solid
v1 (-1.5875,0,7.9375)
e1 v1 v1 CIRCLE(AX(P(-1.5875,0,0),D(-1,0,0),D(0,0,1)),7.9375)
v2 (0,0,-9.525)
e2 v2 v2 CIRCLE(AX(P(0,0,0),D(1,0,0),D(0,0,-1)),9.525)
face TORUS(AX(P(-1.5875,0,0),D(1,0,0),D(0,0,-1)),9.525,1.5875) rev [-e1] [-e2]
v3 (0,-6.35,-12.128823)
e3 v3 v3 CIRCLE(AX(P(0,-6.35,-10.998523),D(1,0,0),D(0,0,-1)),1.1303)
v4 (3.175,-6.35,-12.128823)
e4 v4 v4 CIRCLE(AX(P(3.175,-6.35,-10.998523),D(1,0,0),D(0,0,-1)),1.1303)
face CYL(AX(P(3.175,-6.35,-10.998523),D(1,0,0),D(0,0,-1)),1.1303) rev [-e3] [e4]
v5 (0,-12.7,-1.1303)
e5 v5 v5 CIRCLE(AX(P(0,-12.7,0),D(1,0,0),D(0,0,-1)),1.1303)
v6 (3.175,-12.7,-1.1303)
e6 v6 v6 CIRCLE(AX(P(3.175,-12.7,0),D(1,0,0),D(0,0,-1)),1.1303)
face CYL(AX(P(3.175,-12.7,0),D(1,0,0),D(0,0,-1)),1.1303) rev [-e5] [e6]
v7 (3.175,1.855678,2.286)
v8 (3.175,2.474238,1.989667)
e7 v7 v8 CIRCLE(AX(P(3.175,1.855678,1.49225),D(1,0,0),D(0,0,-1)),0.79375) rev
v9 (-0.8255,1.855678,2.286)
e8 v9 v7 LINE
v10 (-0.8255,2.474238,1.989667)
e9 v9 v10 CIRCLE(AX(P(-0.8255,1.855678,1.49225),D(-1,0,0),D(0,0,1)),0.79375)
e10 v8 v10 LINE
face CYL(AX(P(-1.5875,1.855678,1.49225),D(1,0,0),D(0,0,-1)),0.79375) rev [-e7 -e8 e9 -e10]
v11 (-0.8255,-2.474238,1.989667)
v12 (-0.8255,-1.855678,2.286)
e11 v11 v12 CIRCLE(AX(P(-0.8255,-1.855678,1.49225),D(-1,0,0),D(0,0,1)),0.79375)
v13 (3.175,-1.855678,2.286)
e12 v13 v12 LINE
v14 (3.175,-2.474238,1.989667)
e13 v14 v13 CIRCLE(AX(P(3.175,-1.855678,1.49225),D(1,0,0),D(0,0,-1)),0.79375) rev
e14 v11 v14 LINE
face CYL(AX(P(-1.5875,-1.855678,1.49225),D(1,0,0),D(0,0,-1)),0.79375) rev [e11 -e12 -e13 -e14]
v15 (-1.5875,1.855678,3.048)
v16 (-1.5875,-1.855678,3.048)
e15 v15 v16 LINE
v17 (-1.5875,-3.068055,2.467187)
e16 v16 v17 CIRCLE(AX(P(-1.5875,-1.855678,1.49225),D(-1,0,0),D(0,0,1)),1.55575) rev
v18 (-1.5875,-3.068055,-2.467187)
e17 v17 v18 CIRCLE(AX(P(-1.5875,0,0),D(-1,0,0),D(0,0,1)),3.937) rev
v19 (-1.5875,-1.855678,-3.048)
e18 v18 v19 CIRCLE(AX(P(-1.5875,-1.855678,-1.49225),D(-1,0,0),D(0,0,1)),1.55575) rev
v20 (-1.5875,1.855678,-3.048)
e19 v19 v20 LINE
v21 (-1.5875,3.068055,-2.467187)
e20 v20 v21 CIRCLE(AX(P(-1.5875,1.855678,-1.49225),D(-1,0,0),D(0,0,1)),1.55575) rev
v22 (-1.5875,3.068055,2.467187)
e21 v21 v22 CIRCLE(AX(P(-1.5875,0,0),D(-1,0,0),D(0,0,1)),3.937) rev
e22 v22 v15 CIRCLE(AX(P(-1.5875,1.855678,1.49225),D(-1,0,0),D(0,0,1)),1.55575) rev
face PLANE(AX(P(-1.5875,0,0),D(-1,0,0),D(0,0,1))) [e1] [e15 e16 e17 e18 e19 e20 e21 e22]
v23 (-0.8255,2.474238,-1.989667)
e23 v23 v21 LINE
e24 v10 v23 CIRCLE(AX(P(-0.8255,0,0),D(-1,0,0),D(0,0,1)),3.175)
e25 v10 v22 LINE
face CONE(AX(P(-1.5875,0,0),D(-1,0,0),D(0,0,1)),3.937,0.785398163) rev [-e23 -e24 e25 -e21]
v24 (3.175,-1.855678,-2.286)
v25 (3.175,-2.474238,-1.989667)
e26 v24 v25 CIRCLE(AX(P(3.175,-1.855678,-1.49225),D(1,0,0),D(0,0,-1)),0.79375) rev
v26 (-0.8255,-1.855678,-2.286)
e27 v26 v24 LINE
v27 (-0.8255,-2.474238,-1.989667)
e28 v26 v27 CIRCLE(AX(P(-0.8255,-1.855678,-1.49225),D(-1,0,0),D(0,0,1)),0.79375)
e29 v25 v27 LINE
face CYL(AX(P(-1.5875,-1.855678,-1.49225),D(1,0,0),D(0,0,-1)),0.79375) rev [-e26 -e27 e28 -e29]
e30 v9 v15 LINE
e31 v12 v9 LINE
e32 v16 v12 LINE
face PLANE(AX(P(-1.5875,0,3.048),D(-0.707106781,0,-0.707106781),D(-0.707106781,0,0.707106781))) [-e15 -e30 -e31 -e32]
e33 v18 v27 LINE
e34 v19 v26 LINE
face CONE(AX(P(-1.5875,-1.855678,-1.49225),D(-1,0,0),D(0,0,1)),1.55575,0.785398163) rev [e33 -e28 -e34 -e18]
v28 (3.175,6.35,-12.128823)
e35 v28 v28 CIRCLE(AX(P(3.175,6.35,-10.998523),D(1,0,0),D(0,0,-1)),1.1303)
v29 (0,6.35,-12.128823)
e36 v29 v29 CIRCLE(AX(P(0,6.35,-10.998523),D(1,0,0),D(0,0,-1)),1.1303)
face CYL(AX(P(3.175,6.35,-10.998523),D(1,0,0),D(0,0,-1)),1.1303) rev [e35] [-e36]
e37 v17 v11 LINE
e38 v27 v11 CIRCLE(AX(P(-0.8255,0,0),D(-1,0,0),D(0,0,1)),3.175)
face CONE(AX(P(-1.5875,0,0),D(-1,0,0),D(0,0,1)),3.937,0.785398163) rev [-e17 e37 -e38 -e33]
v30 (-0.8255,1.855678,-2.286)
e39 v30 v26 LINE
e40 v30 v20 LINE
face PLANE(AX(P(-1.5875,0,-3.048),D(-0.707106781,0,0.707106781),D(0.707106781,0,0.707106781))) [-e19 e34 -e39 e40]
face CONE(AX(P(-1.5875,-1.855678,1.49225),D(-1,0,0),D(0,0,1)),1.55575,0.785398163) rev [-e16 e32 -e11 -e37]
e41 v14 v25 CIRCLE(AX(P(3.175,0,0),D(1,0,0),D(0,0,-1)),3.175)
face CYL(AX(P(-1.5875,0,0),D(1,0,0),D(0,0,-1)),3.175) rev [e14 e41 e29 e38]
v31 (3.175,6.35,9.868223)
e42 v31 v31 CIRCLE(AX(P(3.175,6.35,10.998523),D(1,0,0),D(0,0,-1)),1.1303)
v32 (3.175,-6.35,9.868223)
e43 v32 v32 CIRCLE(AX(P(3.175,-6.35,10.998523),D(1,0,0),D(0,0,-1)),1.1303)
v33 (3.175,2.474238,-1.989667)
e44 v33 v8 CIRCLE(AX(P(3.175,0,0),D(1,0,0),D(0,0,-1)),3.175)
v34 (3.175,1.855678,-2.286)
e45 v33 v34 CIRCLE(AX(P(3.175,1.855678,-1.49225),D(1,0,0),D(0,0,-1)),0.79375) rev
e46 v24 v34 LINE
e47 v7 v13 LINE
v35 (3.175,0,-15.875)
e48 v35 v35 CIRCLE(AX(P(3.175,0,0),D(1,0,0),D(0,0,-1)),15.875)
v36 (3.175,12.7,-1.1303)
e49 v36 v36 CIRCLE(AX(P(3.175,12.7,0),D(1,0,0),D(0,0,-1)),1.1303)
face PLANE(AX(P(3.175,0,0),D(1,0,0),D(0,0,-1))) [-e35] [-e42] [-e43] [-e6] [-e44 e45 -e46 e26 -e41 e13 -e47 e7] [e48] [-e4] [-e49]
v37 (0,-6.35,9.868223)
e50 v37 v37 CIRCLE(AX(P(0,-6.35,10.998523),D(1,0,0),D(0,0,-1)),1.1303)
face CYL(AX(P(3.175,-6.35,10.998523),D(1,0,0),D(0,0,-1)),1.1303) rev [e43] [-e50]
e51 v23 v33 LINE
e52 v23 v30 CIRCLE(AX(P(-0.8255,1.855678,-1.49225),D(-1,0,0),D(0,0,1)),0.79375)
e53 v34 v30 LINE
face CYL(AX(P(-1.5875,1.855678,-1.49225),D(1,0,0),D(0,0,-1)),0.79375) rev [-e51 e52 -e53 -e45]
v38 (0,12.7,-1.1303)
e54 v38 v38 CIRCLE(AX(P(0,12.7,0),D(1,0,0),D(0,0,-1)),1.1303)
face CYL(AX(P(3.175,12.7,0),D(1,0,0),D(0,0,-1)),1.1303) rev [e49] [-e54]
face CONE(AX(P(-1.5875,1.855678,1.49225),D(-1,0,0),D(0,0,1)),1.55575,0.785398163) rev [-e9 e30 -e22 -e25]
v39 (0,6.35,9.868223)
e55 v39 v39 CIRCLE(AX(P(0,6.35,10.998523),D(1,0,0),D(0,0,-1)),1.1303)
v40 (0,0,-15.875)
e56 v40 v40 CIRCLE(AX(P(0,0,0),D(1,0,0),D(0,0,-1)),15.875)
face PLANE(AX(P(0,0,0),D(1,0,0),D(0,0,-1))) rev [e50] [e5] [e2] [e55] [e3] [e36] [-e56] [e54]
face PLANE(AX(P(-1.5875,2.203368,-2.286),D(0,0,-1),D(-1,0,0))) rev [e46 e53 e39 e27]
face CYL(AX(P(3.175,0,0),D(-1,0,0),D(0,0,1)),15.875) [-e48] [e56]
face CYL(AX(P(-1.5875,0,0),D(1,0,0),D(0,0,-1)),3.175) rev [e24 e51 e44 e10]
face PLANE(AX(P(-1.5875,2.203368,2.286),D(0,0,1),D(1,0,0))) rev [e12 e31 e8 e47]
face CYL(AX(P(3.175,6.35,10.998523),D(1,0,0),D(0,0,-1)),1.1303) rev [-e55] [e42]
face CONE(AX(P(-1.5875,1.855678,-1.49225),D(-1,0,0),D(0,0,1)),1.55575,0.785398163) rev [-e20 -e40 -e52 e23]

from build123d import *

# Parameters (mm, degrees)
SKETCH1_R           = 15.875
BOSS_EXTRUDE1_DEPTH = 3.175
SKETCH2_R           = 7.9375
BOSS_EXTRUDE2_DEPTH = 1.5875
CUT_EXTRUDE1_DEPTH  = 23.950221268
FILLET2_R           = 0.79375
CIRPATTERN1_COUNT   = 6
FILLET9_R           = 1.5875
CHAMFER1_SIZE       = 0.762


with BuildPart() as part:
    # Sketch1 → Boss-Extrude1 (new body)
    with BuildSketch(Plane(origin=(0, 0, 0), x_dir=(0, 0, -1), z_dir=(1, 0, 0))):
        Circle(SKETCH1_R)
    extrude(amount=BOSS_EXTRUDE1_DEPTH)

    # Sketch2 → Boss-Extrude2 (add)
    with BuildSketch(Plane.ZY):
        with Locations(Location((0, 0, 0), (0, 0, 180))):
            Circle(SKETCH2_R)
    extrude(amount=BOSS_EXTRUDE2_DEPTH)

    # Sketch3 → Cut-Extrude1 (cut, through all)
    with BuildSketch(Plane(origin=(3.175, 0, 0), x_dir=(0, 0, -1), z_dir=(1, 0, 0))):
        with BuildLine():
            Line((-2.286, 2.20336765), (-2.286, -2.20336765))
            ThreePointArc((-2.286, -2.20336765), (0, -3.175), (2.286, -2.20336765))
            Line((2.286, -2.20336765), (2.286, 2.20336765))
            ThreePointArc((2.286, 2.20336765), (0, 3.175), (-2.286, 2.20336765))
        make_face()
    extrude(amount=-CUT_EXTRUDE1_DEPTH, mode=Mode.SUBTRACT)

    # Fillet2
    fillet2_edges = [part.edges().sort_by_distance(p)[0] for p in [
        (0.79375, 2.20336765, 2.286),
        (0.79375, 2.20336765, -2.286),
        (0.79375, -2.20336765, -2.286),
        (0.79375, -2.20336765, 2.286),
    ]]
    fillet(fillet2_edges, radius=FILLET2_R)

    # Sketch5 → #4-40 Tapped Hole1 (revolve, cut)
    with BuildSketch(Plane(origin=(3.175, 12.7, 0), x_dir=(0, 0, -1), z_dir=(0, 1, 0))):
        Polygon((0, 0), (0, 8.299152758), (1.1303, 7.62), (1.1303, 0), align=None)
    f_4_40_tapped_hole1 = revolve(axis=Axis((9.525, 12.7, 0), (-1, 0, 0)), mode=Mode.SUBTRACT)

    # CirPattern1: #4-40 Tapped Hole1 ×6 about axis
    cirpattern1_axis = Axis((0, 0, 0), (1, 0, 0))
    for i in range(1, CIRPATTERN1_COUNT):
        add(f_4_40_tapped_hole1.rotate(cirpattern1_axis, i * 360 / CIRPATTERN1_COUNT), mode=Mode.SUBTRACT)

    # Fillet9
    fillet9_edges = [part.edges().sort_by_distance(p)[0] for p in [
        (0, 0, 7.9375),
    ]]
    fillet(fillet9_edges, radius=FILLET9_R - 0.0001)  # a hair under: the kernel refuses the full size

    # Chamfer1
    chamfer1_edges = [part.edges().sort_by_distance(p)[0] for p in [
        (-1.5875, 0, -2.286),
        (-1.5875, -3.175, 0),
        (-1.5875, 0, 2.286),
        (-1.5875, 3.175, 0),
        (-1.5875, -2.198617373, -2.208093398),
        (-1.5875, -2.198617373, 2.208093398),
        (-1.5875, 2.198617373, -2.208093398),
        (-1.5875, 2.198617373, 2.208093398),
    ]]
    chamfer(chamfer1_edges, length=CHAMFER1_SIZE)


solid = part.part
